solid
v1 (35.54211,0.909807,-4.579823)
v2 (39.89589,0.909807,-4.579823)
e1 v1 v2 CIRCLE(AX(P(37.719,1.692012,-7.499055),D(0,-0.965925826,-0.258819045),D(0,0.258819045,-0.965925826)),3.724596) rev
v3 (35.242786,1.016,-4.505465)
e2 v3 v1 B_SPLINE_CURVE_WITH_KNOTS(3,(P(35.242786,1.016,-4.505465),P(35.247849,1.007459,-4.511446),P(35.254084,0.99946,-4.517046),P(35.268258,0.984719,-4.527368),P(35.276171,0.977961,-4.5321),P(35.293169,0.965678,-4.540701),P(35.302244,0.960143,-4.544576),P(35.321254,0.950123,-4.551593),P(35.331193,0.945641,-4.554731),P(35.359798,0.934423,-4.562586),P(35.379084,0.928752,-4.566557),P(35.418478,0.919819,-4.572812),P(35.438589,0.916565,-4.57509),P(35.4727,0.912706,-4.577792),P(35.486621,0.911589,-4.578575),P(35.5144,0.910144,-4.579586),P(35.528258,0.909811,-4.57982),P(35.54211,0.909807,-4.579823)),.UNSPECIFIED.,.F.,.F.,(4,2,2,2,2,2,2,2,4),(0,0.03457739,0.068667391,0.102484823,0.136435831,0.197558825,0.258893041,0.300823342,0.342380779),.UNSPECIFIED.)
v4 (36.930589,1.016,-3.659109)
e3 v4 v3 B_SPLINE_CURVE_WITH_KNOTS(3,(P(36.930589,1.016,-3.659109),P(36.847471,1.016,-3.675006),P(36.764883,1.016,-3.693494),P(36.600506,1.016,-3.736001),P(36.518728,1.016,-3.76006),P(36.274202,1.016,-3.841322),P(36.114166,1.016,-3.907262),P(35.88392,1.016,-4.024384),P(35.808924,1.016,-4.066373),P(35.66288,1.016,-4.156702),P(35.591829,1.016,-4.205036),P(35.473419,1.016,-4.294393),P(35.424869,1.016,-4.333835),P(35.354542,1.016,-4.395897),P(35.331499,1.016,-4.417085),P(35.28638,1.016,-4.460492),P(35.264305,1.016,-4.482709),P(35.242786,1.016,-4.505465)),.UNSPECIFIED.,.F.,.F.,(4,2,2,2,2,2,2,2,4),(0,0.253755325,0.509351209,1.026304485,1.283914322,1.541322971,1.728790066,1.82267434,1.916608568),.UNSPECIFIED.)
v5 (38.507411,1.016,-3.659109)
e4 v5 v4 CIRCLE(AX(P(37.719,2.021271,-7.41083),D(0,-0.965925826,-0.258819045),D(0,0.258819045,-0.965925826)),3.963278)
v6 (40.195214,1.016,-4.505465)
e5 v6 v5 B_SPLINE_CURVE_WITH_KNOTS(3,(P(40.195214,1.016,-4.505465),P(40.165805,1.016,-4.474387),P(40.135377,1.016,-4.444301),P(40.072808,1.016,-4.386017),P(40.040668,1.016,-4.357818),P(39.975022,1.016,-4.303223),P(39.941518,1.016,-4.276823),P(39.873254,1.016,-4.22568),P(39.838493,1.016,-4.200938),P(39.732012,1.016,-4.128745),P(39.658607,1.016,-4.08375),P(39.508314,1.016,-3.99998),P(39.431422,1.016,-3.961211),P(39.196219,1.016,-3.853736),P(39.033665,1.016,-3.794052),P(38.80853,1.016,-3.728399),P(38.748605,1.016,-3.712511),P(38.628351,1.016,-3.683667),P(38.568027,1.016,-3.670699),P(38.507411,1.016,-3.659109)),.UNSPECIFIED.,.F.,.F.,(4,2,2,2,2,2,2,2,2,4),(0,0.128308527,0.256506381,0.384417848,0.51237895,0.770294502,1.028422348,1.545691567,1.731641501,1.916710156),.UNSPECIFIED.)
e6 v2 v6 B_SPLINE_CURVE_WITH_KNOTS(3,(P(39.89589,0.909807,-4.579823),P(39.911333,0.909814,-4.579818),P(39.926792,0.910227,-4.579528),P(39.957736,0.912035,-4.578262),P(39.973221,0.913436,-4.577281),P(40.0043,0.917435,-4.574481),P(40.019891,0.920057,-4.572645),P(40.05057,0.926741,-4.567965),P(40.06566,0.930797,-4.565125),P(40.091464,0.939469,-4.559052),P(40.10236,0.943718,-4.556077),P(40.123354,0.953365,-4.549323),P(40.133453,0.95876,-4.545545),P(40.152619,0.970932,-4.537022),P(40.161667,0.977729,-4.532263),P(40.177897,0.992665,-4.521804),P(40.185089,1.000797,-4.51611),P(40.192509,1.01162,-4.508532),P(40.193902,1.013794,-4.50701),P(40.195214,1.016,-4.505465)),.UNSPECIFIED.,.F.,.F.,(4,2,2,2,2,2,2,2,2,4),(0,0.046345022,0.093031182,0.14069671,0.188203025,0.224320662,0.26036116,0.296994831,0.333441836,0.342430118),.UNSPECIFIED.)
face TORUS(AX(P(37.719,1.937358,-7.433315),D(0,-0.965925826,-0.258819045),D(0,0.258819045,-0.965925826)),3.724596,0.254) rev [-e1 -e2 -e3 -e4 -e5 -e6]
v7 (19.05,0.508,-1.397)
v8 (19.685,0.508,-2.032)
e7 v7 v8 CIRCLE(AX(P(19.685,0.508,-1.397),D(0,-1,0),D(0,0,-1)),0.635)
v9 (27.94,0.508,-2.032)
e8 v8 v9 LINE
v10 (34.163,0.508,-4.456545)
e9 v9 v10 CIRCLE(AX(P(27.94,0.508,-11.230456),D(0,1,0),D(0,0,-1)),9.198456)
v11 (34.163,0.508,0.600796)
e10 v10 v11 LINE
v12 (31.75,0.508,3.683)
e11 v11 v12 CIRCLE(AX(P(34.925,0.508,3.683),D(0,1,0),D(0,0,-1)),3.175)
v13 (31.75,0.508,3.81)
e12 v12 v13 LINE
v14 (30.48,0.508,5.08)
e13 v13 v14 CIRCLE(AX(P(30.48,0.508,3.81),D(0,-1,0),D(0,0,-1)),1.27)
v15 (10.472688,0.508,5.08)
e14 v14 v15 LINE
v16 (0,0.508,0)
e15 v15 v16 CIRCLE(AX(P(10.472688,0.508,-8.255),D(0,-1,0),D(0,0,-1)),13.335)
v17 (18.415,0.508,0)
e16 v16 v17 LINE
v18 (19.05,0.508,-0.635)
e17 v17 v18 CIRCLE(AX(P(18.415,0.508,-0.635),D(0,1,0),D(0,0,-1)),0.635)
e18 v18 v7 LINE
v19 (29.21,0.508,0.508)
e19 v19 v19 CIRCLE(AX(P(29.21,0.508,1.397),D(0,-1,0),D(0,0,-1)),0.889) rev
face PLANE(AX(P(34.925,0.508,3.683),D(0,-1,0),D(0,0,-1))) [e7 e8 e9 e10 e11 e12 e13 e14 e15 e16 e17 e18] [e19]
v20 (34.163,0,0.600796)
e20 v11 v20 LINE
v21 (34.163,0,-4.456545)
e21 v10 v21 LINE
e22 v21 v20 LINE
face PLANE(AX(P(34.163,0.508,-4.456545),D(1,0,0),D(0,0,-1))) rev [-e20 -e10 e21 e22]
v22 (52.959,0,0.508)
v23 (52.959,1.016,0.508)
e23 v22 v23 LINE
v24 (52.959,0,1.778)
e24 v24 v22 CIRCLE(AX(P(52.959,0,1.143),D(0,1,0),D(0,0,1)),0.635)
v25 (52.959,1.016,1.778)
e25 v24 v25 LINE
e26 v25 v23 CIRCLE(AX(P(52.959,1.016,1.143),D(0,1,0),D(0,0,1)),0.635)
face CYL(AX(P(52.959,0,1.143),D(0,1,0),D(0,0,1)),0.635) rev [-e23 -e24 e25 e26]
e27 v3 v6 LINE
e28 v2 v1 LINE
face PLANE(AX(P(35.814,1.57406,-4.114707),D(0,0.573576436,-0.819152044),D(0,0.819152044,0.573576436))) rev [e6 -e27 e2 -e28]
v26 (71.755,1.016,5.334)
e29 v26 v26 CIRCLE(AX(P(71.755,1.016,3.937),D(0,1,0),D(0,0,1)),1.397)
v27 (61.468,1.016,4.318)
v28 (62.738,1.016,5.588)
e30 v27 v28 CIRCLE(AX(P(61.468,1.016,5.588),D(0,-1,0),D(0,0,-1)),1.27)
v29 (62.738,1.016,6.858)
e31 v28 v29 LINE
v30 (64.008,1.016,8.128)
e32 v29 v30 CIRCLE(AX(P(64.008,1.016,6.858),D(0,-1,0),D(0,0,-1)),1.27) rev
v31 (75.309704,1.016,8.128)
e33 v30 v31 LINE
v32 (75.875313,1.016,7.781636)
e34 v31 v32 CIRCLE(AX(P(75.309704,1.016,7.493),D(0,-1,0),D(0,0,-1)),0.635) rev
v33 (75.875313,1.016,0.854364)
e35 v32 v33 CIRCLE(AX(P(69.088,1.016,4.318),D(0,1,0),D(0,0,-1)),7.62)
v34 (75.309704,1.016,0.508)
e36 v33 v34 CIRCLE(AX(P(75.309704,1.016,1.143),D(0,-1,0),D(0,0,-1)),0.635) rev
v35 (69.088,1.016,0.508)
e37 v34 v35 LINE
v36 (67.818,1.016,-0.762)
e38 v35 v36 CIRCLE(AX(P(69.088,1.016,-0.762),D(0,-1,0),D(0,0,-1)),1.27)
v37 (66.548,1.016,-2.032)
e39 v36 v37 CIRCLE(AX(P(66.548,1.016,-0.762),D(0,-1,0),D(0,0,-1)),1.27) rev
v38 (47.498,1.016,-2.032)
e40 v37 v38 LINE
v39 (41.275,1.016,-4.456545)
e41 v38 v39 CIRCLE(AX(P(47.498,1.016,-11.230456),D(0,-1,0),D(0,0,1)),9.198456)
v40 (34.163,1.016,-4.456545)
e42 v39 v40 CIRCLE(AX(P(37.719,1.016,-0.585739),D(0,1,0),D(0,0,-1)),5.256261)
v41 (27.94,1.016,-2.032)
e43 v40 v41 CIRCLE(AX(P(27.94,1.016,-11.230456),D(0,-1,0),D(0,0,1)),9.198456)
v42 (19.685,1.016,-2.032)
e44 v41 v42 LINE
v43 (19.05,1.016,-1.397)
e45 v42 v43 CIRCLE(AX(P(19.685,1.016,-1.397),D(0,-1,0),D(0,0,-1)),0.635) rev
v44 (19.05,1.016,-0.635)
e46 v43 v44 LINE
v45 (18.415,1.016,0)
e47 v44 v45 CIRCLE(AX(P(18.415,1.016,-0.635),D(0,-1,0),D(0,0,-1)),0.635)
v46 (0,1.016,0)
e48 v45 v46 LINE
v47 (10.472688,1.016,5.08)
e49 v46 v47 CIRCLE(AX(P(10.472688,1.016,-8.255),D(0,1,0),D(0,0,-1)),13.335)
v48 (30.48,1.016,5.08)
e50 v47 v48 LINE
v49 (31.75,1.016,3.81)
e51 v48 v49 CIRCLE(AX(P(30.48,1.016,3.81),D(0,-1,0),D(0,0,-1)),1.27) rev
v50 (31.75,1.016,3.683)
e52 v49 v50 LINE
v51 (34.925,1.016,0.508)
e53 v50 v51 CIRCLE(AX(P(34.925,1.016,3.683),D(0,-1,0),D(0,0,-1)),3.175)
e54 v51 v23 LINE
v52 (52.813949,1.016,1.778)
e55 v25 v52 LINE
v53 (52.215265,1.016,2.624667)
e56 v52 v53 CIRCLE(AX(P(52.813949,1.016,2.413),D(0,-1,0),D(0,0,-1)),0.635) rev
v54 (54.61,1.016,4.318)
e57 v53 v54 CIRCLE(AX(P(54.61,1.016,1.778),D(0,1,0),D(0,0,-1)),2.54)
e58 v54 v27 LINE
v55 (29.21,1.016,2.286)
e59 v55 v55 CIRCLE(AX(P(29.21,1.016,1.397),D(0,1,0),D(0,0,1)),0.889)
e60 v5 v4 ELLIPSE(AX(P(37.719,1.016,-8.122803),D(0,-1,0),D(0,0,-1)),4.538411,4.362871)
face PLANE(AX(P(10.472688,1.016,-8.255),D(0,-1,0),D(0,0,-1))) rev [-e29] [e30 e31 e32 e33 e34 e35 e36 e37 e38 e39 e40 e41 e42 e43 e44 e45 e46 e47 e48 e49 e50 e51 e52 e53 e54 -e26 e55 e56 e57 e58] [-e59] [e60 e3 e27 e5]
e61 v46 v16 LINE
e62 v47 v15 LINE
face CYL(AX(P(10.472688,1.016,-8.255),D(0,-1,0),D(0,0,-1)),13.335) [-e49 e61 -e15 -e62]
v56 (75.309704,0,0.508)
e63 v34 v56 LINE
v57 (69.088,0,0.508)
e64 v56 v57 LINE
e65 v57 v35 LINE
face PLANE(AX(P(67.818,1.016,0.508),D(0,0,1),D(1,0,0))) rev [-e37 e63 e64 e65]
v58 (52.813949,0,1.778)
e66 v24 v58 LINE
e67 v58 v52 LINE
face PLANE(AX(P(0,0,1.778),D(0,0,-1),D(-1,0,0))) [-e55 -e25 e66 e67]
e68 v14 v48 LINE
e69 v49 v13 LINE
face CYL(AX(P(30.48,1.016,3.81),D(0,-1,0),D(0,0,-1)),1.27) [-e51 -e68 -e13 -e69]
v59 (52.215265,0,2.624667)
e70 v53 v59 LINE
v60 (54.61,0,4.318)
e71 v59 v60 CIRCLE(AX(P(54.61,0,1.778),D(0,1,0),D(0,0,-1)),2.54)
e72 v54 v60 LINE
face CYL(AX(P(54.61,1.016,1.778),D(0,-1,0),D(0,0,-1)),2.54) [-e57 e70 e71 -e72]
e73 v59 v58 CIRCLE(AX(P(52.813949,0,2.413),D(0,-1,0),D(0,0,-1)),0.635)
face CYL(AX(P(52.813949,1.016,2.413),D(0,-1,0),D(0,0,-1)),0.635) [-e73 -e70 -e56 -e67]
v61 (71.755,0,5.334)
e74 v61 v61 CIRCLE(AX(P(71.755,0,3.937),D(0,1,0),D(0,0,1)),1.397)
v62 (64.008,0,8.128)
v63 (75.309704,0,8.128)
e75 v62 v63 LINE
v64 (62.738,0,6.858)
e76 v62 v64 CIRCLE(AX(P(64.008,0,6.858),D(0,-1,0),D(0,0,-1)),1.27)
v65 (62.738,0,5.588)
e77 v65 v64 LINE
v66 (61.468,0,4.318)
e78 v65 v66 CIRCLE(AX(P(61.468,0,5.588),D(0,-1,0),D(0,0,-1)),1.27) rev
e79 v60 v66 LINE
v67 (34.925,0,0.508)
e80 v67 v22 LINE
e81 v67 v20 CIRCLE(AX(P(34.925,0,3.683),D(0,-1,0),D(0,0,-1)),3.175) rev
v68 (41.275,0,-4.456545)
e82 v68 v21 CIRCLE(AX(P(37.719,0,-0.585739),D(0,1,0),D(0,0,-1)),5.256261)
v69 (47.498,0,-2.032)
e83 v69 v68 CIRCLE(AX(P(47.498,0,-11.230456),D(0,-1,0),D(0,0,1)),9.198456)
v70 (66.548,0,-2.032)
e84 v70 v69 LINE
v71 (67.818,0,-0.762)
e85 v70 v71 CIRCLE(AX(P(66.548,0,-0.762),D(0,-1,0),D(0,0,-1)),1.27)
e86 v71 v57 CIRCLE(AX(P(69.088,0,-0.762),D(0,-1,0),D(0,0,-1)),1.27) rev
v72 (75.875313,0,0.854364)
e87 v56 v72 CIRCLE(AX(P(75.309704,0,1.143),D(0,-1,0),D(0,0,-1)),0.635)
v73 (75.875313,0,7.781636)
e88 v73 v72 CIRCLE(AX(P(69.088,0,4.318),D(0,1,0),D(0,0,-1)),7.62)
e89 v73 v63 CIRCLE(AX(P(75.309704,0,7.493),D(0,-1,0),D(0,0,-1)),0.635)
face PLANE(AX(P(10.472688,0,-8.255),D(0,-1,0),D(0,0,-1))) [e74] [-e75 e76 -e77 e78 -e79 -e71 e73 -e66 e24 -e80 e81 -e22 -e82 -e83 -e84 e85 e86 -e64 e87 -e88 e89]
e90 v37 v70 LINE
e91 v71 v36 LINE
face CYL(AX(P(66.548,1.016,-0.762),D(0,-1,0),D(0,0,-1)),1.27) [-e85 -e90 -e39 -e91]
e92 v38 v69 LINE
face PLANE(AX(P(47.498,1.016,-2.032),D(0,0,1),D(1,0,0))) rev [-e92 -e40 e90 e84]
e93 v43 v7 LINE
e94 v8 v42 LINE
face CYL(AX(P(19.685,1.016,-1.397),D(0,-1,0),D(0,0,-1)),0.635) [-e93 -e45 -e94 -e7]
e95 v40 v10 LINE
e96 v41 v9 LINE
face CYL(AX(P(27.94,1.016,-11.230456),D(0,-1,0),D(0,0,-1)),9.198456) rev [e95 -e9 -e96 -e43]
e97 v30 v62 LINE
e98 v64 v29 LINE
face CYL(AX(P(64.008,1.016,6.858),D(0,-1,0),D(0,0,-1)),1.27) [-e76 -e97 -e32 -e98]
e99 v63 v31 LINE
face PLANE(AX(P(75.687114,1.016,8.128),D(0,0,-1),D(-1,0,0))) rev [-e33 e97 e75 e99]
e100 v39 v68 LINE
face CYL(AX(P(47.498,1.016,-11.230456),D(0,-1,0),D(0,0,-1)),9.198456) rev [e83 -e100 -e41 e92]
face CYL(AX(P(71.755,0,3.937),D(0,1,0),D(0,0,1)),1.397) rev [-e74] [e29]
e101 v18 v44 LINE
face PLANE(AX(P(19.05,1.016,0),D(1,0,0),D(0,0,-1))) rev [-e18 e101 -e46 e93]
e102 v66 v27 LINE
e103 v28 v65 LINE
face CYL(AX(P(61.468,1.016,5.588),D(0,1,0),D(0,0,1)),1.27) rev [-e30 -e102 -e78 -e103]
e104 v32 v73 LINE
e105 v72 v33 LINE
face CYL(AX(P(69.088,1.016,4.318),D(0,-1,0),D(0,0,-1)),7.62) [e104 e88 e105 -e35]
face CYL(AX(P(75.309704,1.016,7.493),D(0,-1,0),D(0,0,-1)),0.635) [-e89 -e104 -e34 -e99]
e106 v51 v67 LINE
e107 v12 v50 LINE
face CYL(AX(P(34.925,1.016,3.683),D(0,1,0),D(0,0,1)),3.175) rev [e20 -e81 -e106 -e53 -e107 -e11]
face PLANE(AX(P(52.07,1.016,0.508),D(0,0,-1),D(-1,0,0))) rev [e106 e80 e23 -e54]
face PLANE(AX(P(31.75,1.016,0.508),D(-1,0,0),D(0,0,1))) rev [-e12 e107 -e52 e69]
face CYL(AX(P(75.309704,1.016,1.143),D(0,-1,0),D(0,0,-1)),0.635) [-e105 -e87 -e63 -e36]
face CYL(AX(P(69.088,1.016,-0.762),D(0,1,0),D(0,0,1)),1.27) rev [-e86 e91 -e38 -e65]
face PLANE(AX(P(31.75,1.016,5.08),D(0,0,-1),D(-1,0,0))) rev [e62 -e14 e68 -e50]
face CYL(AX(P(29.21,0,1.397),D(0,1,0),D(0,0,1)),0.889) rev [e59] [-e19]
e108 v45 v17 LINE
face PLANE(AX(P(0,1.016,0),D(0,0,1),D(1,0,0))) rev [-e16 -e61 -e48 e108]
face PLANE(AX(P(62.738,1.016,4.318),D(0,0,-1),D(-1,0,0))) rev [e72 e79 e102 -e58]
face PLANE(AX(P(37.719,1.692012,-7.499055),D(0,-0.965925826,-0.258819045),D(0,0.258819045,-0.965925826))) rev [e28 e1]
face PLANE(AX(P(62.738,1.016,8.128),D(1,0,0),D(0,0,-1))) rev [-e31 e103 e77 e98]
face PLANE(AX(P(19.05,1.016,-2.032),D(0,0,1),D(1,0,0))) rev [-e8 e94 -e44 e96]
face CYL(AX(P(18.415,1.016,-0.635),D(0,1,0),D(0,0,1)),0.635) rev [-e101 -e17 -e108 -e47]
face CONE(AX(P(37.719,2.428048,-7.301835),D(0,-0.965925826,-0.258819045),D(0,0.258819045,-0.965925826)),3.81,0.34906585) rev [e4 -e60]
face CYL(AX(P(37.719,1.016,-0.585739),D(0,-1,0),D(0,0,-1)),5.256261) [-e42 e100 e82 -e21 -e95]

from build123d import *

# Parameters (mm, degrees)
BOSS_EXTRUDE1_DEPTH    = 1.016
CUT_EXTRUDE1_DEPTH     = 78.144111272
FILLET1_R              = 0.635
FILLET2_R              = 1.27
FILLET3_R              = 0.635
SKETCH3_R              = 1.397
CUT_EXTRUDE2_DEPTH     = 78.144111272
CUT_EXTRUDE3_DEPTH     = 0.360211591
CUT_EXTRUDE3_TAPER     = 20
FILLET4_R              = 0.254
FILLET5_R              = 3.175
SKETCH5_R              = 0.889
CUT_EXTRUDE4_DEPTH     = 78.144111382
CUT_EXTRUDE5_OUTLINE_W = 0.508
CUT_EXTRUDE5_OUTLINE_H = 11.08
CUT_EXTRUDE5_DEPTH     = 34.163


# Read off the part's stored shape, not the designer's step: Cut-Extrude3, Cut-Extrude5
with BuildPart() as part:
    # Sketch1 → Boss-Extrude1 (new body)
    with BuildSketch(Plane(origin=(0, 0, 0), x_dir=(1, 0, 0), z_dir=(0, 1, 0))):
        with BuildLine():
            Line((0, 0), (19.05, 0))
            Line((19.05, 0), (19.05, 2.032))
            Line((19.05, 2.032), (27.94, 2.032))
            ThreePointArc((27.94, 2.032), (31.279316908, 2.659542662), (34.163, 4.456545455))
            ThreePointArc((34.163, 4.456545455), (37.719, 5.842), (41.275, 4.456545455))
            ThreePointArc((41.275, 4.456545455), (44.158683092, 2.659542662), (47.498, 2.032))
            Line((47.498, 2.032), (67.818, 2.032))
            Line((67.818, 2.032), (67.818, -0.508))
            Line((67.818, -0.508), (75.687113577, -0.508))
            ThreePointArc((75.687113577, -0.508), (76.708, -4.318), (75.687113577, -8.128))
            Line((75.687113577, -8.128), (62.738, -8.128))
            Line((62.738, -8.128), (62.738, -4.318))
            Line((62.738, -4.318), (54.61, -4.318))
            ThreePointArc((54.61, -4.318), (52.813948776, -3.574051224), (52.07, -1.778))
            Line((52.07, -1.778), (52.07, -0.508))
            Line((52.07, -0.508), (31.75, -0.508))
            Line((31.75, -0.508), (31.75, -5.08))
            Line((31.75, -5.08), (10.472688289, -5.08))
            ThreePointArc((10.472688289, -5.08), (4.652817156, -3.742971704), (0, 0))
        make_face()
    extrude(amount=BOSS_EXTRUDE1_DEPTH)

    # Sketch2 → Cut-Extrude1 (cut, through all)
    with BuildSketch(Plane(origin=(0, 1.016, 0), x_dir=(1, 0, 0), z_dir=(0, 1, 0))):
        with BuildLine():
            Line((52.959, -1.778), (52.07, -1.778))
            Line((52.07, -1.778), (52.07, -0.508))
            Line((52.07, -0.508), (52.959, -0.508))
            ThreePointArc((52.959, -0.508), (53.594, -1.143), (52.959, -1.778))
        make_face()
    extrude(amount=-CUT_EXTRUDE1_DEPTH, mode=Mode.SUBTRACT)

    # Fillet1
    fillet1_edges = [part.edges().sort_by_distance(p)[0] for p in [
        (52.07, 0.508, 1.778),
    ]]
    fillet(fillet1_edges, radius=FILLET1_R)

    # Fillet2
    fillet2_edges = [part.edges().sort_by_distance(p)[0] for p in [
        (67.818, 0.508, 0.508),
        (67.818, 0.508, -2.032),
        (62.738, 0.508, 8.128),
        (62.738, 0.508, 4.318),
        (31.75, 0.508, 5.08),
    ]]
    fillet(fillet2_edges, radius=FILLET2_R - 0.0001)  # a hair under: the kernel refuses the full size

    # Fillet3
    fillet3_edges = [part.edges().sort_by_distance(p)[0] for p in [
        (19.05, 0.508, 0),
        (19.05, 0.508, -2.032),
        (75.687113577, 0.508, 0.508),
        (75.687113577, 0.508, 8.128),
    ]]
    fillet(fillet3_edges, radius=FILLET3_R)

    # Sketch3 → Cut-Extrude2 (cut, through all)
    with BuildSketch(Plane(origin=(0, 1.016, 0), x_dir=(1, 0, 0), z_dir=(0, 1, 0))):
        with Locations(Location((71.755, -3.937, 0), (0, 0, 270))):
            Circle(SKETCH3_R)
    extrude(amount=-CUT_EXTRUDE2_DEPTH, mode=Mode.SUBTRACT)

    # Cut-Extrude3 outline → Cut-Extrude3 (cut)
    with BuildSketch(Plane(origin=(0, -0.296094575, -0.079338302), x_dir=(-1, 0, 0), z_dir=(0, 0.9659258262890681, 0.25881904510252135))):
        with BuildLine():
            ThreePointArc((-34.967158874, -4.659244146), (-37.719, -3.594110297), (-40.470841126, -4.659244146))
            Line((-40.470841126, -4.659244146), (-34.967158874, -4.659244146))
        make_face()
    extrude(amount=CUT_EXTRUDE3_DEPTH, taper=CUT_EXTRUDE3_TAPER, mode=Mode.SUBTRACT)

    # Fillet4
    fillet4_edges = [part.edges().sort_by_distance(p)[0] for p in [
        (37.719, 0.63412962, -3.55098226),
    ]]
    fillet(fillet4_edges, radius=FILLET4_R - 0.0001)  # a hair under: the kernel refuses the full size

    # Fillet5
    fillet5_edges = [part.edges().sort_by_distance(p)[0] for p in [
        (31.75, 0.508, 0.508),
    ]]
    fillet(fillet5_edges, radius=FILLET5_R)

    # Sketch5 → Cut-Extrude4 (cut, through all)
    with BuildSketch(Plane(origin=(0, 1.016, 0), x_dir=(1, 0, 0), z_dir=(0, 1, 0))):
        with Locations(Location((29.21, -1.397, 0), (0, 0, 270))):
            Circle(SKETCH5_R)
    extrude(amount=-CUT_EXTRUDE4_DEPTH, mode=Mode.SUBTRACT)

    # Cut-Extrude5 outline → Cut-Extrude5 (cut)
    with BuildSketch(Plane.YZ):
        with Locations((0.254, -0.46)):
            Rectangle(CUT_EXTRUDE5_OUTLINE_W, CUT_EXTRUDE5_OUTLINE_H)
    extrude(amount=CUT_EXTRUDE5_DEPTH, mode=Mode.SUBTRACT)


solid = part.part
